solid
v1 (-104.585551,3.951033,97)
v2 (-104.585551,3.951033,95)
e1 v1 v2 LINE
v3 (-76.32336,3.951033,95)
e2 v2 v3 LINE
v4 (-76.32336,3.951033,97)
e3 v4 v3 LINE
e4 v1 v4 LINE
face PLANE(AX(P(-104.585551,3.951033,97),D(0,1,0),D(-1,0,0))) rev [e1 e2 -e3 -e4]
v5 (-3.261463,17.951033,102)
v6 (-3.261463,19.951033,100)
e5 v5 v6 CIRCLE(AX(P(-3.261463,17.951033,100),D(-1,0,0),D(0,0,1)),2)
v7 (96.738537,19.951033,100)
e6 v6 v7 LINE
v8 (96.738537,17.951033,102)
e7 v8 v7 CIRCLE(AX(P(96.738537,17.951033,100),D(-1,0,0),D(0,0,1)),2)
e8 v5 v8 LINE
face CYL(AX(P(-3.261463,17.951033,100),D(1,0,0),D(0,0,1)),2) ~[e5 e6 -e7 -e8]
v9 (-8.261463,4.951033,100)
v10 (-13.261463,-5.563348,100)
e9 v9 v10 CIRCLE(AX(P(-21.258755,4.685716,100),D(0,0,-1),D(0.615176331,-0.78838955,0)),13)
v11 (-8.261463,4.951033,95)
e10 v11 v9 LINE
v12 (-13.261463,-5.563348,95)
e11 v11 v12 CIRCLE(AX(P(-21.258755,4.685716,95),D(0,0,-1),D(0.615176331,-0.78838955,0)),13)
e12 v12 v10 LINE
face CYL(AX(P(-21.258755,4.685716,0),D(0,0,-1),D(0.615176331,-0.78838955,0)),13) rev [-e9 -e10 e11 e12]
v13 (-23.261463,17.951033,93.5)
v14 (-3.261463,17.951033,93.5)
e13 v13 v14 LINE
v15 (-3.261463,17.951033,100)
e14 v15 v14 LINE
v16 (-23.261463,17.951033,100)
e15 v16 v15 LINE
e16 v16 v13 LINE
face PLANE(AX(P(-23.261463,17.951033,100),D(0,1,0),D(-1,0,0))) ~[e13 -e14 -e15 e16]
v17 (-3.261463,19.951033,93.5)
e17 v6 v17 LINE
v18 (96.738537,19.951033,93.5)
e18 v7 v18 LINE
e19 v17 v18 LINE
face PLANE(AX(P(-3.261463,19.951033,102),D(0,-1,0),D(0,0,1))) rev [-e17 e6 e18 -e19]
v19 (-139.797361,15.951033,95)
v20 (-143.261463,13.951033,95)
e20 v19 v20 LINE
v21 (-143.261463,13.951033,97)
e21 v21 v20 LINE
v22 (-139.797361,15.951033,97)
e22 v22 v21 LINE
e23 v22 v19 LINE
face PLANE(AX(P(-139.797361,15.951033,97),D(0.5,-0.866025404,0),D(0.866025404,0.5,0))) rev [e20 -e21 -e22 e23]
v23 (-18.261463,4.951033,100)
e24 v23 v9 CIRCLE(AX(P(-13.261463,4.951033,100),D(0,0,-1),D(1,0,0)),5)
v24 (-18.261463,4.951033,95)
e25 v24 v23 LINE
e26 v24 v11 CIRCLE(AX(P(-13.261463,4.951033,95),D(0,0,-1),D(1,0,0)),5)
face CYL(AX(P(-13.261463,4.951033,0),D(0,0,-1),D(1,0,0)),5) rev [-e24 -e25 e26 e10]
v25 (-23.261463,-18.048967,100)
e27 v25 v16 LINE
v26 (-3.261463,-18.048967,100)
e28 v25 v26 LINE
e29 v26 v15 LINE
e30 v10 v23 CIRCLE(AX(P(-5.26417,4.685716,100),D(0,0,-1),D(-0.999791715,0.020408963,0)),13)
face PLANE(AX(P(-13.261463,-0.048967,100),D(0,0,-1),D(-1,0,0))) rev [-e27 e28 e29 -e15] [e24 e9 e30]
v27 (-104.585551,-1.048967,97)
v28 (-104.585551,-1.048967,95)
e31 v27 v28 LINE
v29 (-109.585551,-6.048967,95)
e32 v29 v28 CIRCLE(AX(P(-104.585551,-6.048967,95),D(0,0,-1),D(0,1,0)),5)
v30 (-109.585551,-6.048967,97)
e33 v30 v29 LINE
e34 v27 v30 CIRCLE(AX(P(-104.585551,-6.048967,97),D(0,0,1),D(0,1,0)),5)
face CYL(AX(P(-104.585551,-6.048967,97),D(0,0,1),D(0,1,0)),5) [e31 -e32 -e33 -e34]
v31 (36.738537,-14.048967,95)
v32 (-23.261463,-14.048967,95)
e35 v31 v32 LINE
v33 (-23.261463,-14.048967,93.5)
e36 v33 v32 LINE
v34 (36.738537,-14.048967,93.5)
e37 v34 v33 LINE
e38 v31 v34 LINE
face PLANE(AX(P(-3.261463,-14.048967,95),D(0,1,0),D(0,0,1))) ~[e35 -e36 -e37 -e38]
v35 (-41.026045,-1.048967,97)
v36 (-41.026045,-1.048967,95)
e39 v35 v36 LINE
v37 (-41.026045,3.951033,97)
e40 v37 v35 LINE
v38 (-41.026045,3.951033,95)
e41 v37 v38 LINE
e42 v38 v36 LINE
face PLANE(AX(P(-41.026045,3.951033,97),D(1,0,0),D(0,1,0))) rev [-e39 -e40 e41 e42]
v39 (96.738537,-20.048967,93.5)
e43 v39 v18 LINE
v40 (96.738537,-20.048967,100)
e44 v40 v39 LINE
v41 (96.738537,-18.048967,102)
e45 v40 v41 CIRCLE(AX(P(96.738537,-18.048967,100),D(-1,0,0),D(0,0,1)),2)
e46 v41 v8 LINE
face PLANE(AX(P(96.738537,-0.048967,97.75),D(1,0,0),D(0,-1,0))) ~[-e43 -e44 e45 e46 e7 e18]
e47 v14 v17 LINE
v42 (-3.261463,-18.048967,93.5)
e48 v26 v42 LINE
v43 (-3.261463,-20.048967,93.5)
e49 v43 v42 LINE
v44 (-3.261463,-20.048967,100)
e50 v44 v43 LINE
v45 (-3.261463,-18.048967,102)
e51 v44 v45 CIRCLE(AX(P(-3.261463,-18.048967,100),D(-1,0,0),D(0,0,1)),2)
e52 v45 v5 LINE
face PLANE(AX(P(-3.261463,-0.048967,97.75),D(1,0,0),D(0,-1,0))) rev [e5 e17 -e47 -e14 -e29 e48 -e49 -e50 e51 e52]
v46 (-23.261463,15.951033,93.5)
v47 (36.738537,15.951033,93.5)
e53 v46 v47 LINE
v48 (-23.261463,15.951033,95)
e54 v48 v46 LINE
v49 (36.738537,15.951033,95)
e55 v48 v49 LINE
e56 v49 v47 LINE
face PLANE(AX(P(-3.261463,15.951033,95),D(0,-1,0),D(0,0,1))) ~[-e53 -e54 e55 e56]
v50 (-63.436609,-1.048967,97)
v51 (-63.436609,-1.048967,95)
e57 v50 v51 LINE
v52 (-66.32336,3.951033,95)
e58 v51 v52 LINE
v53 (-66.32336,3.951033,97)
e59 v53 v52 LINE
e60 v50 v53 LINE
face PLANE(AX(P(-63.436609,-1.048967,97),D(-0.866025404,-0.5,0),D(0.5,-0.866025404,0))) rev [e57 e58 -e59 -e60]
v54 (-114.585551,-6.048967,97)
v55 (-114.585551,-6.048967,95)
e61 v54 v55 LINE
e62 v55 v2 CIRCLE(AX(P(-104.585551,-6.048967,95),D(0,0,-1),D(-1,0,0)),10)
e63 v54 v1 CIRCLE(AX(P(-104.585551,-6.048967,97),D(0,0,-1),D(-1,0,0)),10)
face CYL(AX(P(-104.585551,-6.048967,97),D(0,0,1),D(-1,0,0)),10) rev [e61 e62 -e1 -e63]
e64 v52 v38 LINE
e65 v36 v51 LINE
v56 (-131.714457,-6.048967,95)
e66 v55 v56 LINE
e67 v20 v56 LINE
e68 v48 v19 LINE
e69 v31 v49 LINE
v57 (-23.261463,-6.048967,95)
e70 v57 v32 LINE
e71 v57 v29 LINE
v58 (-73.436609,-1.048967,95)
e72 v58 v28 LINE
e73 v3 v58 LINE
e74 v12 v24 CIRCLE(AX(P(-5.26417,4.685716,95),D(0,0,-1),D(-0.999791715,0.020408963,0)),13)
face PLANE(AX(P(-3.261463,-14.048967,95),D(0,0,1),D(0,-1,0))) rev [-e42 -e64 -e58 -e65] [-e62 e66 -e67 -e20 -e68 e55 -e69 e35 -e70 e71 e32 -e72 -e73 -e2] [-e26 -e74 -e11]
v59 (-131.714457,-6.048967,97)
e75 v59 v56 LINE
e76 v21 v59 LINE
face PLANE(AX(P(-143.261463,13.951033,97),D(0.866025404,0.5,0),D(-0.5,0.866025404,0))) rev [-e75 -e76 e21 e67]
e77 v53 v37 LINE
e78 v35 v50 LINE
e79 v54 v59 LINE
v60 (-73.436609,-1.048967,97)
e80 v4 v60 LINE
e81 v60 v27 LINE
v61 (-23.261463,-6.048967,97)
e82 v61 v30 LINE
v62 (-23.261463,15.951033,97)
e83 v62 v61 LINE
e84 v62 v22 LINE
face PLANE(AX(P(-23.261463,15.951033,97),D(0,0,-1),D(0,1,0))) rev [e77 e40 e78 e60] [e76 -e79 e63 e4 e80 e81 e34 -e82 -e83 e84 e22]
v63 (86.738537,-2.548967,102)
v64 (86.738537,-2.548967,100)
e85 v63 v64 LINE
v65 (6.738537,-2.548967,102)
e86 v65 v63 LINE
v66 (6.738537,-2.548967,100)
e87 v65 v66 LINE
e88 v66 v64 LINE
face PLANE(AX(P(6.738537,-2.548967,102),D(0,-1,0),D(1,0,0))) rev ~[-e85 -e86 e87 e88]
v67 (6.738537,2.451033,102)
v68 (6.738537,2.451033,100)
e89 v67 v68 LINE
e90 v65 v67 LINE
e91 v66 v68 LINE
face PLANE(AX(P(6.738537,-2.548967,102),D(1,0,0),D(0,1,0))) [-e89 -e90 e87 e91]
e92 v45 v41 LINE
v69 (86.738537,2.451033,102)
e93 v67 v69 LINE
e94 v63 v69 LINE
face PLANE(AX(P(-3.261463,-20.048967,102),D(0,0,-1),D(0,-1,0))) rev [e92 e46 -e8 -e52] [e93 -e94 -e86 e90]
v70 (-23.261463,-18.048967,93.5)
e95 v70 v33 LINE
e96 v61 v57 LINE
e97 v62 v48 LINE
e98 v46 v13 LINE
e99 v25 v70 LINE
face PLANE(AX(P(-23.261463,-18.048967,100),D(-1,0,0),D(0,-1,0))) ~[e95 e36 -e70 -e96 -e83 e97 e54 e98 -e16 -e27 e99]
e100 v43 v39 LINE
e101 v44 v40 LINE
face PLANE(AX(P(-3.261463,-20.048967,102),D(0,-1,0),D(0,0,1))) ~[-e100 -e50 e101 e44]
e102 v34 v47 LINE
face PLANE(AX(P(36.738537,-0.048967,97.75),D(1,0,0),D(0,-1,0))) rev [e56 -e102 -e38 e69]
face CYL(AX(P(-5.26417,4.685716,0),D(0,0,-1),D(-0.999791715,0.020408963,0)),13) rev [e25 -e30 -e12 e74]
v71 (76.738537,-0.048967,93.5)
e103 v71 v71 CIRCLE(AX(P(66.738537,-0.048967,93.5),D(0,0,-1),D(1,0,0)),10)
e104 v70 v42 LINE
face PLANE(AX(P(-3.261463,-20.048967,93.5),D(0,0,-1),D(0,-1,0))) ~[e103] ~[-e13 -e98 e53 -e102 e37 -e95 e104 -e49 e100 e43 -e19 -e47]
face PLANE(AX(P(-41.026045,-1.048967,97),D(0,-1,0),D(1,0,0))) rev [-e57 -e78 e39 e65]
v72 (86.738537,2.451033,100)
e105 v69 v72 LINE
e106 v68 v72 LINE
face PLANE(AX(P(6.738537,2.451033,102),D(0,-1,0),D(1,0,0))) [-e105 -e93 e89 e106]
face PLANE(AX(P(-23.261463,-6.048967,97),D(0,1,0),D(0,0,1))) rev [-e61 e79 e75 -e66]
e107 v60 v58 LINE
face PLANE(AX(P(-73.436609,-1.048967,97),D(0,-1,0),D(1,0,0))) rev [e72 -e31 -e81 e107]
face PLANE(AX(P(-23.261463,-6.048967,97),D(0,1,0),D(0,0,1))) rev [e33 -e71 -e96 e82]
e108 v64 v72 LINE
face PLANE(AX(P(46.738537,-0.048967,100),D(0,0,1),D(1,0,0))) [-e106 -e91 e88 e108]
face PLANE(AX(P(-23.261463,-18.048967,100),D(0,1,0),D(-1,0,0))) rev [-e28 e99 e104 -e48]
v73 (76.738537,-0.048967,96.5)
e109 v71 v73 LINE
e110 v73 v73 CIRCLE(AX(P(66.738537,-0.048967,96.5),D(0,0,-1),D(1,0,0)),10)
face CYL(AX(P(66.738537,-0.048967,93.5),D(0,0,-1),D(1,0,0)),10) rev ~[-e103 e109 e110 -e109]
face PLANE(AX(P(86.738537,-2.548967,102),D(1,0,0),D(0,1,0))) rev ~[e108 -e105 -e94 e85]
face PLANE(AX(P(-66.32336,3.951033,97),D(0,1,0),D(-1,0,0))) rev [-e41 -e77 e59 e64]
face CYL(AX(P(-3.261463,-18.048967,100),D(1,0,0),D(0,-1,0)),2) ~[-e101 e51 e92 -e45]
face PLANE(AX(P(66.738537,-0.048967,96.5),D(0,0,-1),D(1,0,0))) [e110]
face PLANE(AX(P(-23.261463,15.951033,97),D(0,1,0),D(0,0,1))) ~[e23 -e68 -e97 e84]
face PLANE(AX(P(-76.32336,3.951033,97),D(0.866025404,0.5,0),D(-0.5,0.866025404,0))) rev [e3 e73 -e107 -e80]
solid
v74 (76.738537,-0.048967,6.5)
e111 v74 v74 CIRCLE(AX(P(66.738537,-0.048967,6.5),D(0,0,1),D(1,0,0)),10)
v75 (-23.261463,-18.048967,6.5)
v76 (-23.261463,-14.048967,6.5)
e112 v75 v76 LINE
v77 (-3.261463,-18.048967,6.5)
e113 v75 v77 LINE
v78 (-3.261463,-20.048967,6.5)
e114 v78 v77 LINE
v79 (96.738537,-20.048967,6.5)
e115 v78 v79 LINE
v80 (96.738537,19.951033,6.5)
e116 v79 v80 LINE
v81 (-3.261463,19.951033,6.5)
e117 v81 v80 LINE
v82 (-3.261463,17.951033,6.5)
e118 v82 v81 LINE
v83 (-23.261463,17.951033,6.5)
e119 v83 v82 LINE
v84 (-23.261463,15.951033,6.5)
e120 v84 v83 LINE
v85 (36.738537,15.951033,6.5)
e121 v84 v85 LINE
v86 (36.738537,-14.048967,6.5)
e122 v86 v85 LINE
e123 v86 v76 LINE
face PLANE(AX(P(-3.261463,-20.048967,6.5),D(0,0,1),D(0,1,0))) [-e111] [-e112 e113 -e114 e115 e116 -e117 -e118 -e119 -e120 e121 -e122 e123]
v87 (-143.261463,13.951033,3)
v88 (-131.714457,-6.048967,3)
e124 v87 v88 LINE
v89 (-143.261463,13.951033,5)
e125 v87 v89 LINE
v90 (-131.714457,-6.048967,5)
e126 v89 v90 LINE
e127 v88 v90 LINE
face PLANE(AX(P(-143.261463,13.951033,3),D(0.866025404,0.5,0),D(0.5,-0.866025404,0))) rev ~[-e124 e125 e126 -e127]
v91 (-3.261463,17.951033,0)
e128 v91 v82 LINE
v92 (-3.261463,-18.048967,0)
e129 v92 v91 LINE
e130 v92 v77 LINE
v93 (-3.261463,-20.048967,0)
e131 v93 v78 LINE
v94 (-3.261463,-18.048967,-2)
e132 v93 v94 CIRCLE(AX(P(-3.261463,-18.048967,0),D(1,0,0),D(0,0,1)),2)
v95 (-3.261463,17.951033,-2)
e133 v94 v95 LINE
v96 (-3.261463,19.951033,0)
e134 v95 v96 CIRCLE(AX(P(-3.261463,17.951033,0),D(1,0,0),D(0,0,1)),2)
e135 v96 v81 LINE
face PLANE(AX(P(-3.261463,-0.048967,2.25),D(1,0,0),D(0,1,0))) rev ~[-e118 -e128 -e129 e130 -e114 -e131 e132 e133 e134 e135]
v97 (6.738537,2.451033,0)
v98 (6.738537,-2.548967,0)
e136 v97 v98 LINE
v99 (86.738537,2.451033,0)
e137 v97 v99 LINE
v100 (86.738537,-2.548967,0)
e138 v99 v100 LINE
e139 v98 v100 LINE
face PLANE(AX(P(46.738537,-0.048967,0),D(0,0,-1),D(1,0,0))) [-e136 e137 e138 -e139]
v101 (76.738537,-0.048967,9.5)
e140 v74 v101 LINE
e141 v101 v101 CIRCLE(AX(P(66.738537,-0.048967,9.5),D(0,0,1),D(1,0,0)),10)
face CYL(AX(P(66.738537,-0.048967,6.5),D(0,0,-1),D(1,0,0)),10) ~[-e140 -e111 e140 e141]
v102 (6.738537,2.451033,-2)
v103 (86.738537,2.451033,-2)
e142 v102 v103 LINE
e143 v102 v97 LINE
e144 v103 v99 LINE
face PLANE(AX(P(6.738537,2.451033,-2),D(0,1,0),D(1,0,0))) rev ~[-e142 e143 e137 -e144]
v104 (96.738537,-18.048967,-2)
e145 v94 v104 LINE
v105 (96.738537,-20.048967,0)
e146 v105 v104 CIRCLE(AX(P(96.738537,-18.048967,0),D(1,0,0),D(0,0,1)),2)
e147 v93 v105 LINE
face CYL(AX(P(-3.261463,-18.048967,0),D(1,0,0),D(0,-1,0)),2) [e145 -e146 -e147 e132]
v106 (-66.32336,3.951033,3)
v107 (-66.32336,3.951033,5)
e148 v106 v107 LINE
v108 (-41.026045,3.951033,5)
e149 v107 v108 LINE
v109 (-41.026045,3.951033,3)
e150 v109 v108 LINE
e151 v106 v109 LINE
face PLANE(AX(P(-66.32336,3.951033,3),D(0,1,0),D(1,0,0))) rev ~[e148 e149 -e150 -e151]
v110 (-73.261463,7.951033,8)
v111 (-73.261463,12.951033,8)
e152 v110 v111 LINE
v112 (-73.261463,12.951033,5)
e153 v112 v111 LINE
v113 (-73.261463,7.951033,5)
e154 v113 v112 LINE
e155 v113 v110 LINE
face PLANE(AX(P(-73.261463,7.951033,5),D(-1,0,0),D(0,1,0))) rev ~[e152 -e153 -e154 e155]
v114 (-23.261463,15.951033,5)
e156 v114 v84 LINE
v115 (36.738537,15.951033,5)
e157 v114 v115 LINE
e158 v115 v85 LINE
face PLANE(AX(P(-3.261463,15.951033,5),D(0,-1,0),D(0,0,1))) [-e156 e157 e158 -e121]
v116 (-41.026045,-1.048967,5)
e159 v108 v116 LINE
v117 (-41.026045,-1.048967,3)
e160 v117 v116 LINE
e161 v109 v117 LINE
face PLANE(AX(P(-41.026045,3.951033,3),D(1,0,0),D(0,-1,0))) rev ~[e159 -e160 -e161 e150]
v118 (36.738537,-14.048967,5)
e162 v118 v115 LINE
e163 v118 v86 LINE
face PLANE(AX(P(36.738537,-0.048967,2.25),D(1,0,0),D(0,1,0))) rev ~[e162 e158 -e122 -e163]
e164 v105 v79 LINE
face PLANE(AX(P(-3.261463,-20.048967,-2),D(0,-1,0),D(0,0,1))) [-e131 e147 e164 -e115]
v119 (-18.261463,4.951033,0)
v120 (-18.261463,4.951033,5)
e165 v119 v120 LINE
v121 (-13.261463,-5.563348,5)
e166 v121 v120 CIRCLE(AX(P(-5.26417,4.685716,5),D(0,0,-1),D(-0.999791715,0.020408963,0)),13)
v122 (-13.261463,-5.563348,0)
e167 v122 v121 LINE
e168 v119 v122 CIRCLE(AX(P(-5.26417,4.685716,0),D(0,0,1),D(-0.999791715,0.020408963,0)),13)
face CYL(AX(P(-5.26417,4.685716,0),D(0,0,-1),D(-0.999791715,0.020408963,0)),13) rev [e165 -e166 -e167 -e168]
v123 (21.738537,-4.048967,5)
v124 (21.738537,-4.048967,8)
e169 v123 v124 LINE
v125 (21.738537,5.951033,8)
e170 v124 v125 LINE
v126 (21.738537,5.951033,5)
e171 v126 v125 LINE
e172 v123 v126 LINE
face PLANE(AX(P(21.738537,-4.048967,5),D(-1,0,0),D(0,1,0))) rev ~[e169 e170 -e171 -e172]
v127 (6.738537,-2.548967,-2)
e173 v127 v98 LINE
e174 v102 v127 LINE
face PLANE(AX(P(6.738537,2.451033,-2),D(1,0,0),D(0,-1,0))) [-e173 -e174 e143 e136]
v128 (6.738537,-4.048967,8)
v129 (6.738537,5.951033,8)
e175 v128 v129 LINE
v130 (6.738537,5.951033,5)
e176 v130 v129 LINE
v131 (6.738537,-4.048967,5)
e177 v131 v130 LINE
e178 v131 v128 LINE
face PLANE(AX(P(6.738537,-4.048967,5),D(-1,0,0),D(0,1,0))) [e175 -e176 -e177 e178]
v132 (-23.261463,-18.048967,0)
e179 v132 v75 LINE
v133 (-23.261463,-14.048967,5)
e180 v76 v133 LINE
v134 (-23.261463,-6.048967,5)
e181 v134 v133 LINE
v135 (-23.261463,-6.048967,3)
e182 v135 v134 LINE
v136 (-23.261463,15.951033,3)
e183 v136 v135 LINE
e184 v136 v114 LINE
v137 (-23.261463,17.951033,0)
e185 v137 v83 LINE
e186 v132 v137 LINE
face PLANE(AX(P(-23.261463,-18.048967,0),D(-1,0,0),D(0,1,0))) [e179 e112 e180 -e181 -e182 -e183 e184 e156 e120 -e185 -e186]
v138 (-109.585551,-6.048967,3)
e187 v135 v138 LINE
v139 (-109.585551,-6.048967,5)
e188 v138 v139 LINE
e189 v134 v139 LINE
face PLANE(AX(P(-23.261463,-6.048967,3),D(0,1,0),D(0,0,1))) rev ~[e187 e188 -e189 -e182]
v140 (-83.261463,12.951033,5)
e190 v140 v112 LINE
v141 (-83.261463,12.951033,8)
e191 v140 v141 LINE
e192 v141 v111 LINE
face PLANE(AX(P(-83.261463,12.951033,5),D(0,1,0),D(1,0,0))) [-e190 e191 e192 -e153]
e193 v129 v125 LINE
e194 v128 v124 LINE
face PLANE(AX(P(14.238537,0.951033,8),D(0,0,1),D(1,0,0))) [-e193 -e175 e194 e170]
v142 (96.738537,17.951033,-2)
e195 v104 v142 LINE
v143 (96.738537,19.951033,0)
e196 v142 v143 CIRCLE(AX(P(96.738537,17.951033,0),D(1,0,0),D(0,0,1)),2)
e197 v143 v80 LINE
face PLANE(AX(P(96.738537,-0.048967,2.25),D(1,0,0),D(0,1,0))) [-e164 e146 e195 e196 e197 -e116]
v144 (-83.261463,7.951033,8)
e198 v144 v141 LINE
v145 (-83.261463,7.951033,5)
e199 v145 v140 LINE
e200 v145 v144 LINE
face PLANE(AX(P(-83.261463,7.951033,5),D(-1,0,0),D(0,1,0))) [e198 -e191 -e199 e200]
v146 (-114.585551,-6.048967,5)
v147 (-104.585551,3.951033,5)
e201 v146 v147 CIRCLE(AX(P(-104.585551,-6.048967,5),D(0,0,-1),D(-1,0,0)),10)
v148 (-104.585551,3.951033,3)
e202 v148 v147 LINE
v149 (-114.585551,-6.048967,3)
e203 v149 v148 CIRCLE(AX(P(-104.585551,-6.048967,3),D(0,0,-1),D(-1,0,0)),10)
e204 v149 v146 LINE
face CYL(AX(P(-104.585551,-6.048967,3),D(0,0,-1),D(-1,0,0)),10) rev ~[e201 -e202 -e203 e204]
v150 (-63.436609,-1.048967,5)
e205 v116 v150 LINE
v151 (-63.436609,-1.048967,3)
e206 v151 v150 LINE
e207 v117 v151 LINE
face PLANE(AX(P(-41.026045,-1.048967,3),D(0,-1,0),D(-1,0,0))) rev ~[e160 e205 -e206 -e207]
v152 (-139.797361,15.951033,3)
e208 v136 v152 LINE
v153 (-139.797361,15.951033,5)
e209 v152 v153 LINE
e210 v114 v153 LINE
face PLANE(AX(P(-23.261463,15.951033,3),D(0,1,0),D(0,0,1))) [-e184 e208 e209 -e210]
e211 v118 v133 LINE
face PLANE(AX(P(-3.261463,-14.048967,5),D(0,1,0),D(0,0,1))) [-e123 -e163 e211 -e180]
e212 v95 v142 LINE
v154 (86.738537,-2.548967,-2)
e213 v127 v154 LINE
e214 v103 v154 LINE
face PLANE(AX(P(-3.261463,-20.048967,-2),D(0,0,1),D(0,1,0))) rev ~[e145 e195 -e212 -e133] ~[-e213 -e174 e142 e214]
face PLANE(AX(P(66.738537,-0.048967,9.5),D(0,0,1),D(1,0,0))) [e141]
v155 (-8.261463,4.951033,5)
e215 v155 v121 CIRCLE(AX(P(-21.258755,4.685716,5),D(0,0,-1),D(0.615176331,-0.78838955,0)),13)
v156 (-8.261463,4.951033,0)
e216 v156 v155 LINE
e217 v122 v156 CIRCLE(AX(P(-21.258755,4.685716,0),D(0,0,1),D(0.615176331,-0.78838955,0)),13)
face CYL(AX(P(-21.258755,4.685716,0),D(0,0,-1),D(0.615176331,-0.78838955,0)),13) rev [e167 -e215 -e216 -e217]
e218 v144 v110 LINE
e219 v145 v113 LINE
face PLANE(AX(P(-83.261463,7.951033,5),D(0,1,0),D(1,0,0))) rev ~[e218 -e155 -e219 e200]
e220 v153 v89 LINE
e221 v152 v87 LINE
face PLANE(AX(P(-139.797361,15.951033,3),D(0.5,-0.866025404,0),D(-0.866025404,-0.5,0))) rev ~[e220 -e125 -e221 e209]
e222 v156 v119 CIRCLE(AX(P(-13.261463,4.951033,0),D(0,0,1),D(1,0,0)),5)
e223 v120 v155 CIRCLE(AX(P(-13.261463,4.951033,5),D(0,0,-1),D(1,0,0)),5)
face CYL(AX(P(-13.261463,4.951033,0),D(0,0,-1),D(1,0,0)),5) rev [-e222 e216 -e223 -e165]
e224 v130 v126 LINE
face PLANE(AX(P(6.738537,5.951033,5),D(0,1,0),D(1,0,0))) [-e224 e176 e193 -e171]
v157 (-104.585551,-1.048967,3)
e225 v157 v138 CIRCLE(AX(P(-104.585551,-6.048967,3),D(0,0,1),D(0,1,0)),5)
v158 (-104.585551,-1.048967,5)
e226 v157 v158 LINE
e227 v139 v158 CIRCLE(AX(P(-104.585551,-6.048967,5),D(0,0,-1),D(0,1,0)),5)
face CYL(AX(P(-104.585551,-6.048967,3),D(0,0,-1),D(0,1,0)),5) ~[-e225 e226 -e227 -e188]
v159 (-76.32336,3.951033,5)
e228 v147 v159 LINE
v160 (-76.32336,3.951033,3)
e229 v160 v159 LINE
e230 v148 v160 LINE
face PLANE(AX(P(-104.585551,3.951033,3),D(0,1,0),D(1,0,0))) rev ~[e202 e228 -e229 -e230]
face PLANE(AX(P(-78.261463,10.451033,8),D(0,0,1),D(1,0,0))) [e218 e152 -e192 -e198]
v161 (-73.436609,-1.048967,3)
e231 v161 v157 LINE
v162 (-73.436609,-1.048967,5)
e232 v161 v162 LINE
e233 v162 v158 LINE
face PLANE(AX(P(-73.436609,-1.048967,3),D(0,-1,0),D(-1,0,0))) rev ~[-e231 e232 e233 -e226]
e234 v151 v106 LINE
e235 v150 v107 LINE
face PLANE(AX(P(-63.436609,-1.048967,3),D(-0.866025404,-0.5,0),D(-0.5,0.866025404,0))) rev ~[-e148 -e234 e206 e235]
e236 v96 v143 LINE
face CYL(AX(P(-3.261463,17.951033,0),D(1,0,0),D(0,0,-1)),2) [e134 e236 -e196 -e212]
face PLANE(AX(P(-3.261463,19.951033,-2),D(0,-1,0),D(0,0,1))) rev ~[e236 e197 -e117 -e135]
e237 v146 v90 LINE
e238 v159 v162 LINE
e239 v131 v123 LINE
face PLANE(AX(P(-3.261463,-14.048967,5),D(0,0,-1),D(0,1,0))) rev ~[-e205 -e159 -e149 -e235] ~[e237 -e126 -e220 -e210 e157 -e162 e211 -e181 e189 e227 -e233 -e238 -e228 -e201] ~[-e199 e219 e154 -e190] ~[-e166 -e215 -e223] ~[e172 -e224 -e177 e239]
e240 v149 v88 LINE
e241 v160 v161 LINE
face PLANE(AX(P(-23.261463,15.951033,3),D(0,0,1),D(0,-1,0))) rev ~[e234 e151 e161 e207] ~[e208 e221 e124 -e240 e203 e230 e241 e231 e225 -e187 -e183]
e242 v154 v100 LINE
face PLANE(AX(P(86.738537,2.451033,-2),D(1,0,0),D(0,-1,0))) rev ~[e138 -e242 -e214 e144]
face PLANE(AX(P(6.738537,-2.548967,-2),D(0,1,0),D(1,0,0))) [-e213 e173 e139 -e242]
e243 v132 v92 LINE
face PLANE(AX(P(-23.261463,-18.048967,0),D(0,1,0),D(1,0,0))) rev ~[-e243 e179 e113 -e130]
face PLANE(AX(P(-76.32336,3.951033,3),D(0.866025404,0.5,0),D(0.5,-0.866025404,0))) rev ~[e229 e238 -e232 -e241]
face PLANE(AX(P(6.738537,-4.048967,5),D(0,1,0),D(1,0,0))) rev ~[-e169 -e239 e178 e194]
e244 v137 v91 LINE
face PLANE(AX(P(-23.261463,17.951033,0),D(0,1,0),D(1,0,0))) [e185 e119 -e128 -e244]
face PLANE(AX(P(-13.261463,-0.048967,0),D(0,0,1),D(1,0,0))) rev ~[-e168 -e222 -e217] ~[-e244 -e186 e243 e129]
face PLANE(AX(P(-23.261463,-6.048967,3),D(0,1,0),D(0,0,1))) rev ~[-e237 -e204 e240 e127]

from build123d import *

# Parameters (mm, degrees)
F0_W      = 20
F0_H      = 36
F1_DEPTH  = 6.5
F3_W      = 22
F3_H      = 3.5
F4_DEPTH  = 120
F2_W      = 30
F2_H      = 1.5
F5_DEPTH  = 140.001
F7_DEPTH  = 25
F8_W      = 40
F8_H      = 8.5
F9_DEPTH  = 100
F10_DEPTH = 40
F13_W     = 10
F13_H     = 5
F13_W_2   = 15
F13_H_2   = 10
F14_DEPTH = 3
F16_DEPTH = 102.001
F17_W     = 80
F17_H     = 5
F18_DEPTH = 2
F21_W     = 80
F21_H     = 5
F22_DEPTH = 2
F25_R     = 2
F25_2_R   = 2
F27_R     = 10
F28_DEPTH = 3
F26_R     = 10
F29_DEPTH = 3


# Not quite as in the source:
# - the program builds the solid bodies; features that only make, move or delete a surface that nothing else refers to are left out


with BuildPart() as f1:
    # F0 (on Top) → F1 (new body)
    with BuildSketch(Plane.XY):
        with Locations((-13.2614625618, -0.0489673983)):
            Rectangle(F0_W, F0_H)
    extrude(amount=F1_DEPTH)

    # F3 (on face) → F4 (join)
    with BuildSketch(Plane(origin=(-23.2614625618, 0, 0), x_dir=(0, -1, 0), z_dir=(-1, 0, 0))):
        with Locations((-4.9510326017, 4.75)):
            Rectangle(F3_W, F3_H)
    extrude(amount=F4_DEPTH)

    # F2 (on face) → F5 (cut, through all)
    with BuildSketch(Plane.YZ.offset(-3.2614625618)):
        with Locations((0.9510326017, 5.75)):
            Rectangle(F2_W, F2_H)
    extrude(amount=-F5_DEPTH, mode=Mode.SUBTRACT)

    # F6 (on face) → F7 (cut)
    with BuildSketch(Plane(origin=(0, 0, 3), x_dir=(1, 0, 0), z_dir=(0, 0, -1))):
        Polygon((-41.026044637, 1.0489673983), (-63.4366088587, 1.0489673983), (-66.3233602047, -3.9510326017), (-41.026044637, -3.9510326017), align=None)
        Polygon((-143.2614625618, 6.0489673983), (-143.2614625618, -13.9510326017), (-131.714457178, 6.0489673983), align=None)
        Polygon((-139.7973609466, -15.9510326017), (-143.2614625618, -13.9510326017), (-143.2614625618, -15.9510326017), align=None)
        with BuildLine():
            Line((-109.5855507255, 6.0489673983), (-114.5855507255, 6.0489673983))
            ThreePointArc((-114.5855507255, 6.0489673983), (-111.6566185373, -1.0221004135), (-104.5855507255, -3.9510326017))
            Line((-104.5855507255, -3.9510326017), (-76.3233602047, -3.9510326017))
            Line((-76.3233602047, -3.9510326017), (-73.4366088587, 1.0489673983))
            Line((-73.4366088587, 1.0489673983), (-104.5855507255, 1.0489673983))
            ThreePointArc((-104.5855507255, 1.0489673983), (-108.1210846314, 2.5134334924), (-109.5855507255, 6.0489673983))
        make_face()
    extrude(amount=-F7_DEPTH, mode=Mode.SUBTRACT)

    # F8 (on face) → F9 (join)
    with BuildSketch(Plane.YZ.offset(-3.2614625618)):
        with Locations((-0.0489673983, 2.25)):
            Rectangle(F8_W, F8_H)
    extrude(amount=F9_DEPTH)

    # F10 (cut): a face of the model
    f10_faces = [f1.faces().sort_by_distance(p)[0] for p in [
        (-3.2614625618, 0.9510326017, 5.75),
    ]]
    extrude(f10_faces, amount=-F10_DEPTH, mode=Mode.SUBTRACT)


with BuildPart() as f12_1:
    # F12: instance of F1
    add(f1.part.mirror(Plane.XY.offset(50)))


with BuildPart() as f1_1:
    add(f1.part)

    # F13 (on face) → F14 (join)
    with BuildSketch(Plane.XY.offset(5)):
        with Locations((-78.2614625618, 10.4510326017)):
            Rectangle(F13_W, F13_H)
        with Locations((14.2385374382, 0.9510326017)):
            Rectangle(F13_W_2, F13_H_2)
    extrude(amount=F14_DEPTH)


with BuildPart() as f16_tool:
    # F15 (on face) → F16 (new body, through all)
    with BuildSketch(Plane.XY):
        with BuildLine():
            ThreePointArc((-18.2614625618, 4.9510326017), (-13.2614625618, -0.0489673983), (-8.2614625618, 4.9510326017))
            ThreePointArc((-8.2614625618, 4.9510326017), (-13.2614625618, 9.9510326017), (-18.2614625618, 4.9510326017))
        make_face()
        with BuildLine():
            ThreePointArc((-13.2614625618, -5.5633480661), (-9.5186017181, -0.8971867633), (-8.2614625618, 4.9510326017))
            ThreePointArc((-8.2614625618, 4.9510326017), (-13.2614625618, -0.0489673983), (-18.2614625618, 4.9510326017))
            ThreePointArc((-18.2614625618, 4.9510326017), (-17.0043234055, -0.8971867633), (-13.2614625618, -5.5633480661))
        make_face()
    extrude(amount=F16_DEPTH)


with BuildPart() as f1_2:
    add(f1_1.part)

    # F16: cut by f16_tool
    add(f16_tool.part, mode=Mode.SUBTRACT)

    # F17 (on face) → F18 (cut)
    with BuildSketch(Plane(origin=(0, 0, -2), x_dir=(1, 0, 0), z_dir=(0, 0, -1))):
        with Locations((46.7385374382, 0.0489673983)):
            Rectangle(F17_W, F17_H)
    extrude(amount=-F18_DEPTH, mode=Mode.SUBTRACT)

    # F25
    f25_edges = [f1_2.edges().sort_by_distance(p)[0] for p in [
        (46.738537, 19.951033, -2),
        (46.738537, -20.048967, -2),
    ]]
    fillet(f25_edges, radius=F25_R)

    # F26 (on face) → F29 (join)
    with BuildSketch(Plane.XY.offset(6.5)):
        with Locations((66.7385374382, -0.0489673983)):
            Circle(F26_R)
    extrude(amount=F29_DEPTH)


with BuildPart() as f12_1_1:
    add(f12_1.part)

    # F16: cut by f16_tool
    add(f16_tool.part, mode=Mode.SUBTRACT)

    # F21 (on face) → F22 (cut)
    with BuildSketch(Plane.XY.offset(102)):
        with Locations((46.7385374382, -0.0489673983)):
            Rectangle(F21_W, F21_H)
    extrude(amount=-F22_DEPTH, mode=Mode.SUBTRACT)

    # F25#2
    f25_2_edges = [f12_1_1.edges().sort_by_distance(p)[0] for p in [
        (46.738537, -20.048967, 102),
        (46.738537, 19.951033, 102),
    ]]
    fillet(f25_2_edges, radius=F25_2_R)

    # F27 (on face) → F28 (cut)
    with BuildSketch(Plane(origin=(0, 0, 93.5), x_dir=(1, 0, 0), z_dir=(0, 0, -1))):
        with Locations((66.7385374382, 0.0489673983)):
            Circle(F27_R)
    extrude(amount=-F28_DEPTH, mode=Mode.SUBTRACT)


solid = Compound([f1_2.part, f12_1_1.part])
